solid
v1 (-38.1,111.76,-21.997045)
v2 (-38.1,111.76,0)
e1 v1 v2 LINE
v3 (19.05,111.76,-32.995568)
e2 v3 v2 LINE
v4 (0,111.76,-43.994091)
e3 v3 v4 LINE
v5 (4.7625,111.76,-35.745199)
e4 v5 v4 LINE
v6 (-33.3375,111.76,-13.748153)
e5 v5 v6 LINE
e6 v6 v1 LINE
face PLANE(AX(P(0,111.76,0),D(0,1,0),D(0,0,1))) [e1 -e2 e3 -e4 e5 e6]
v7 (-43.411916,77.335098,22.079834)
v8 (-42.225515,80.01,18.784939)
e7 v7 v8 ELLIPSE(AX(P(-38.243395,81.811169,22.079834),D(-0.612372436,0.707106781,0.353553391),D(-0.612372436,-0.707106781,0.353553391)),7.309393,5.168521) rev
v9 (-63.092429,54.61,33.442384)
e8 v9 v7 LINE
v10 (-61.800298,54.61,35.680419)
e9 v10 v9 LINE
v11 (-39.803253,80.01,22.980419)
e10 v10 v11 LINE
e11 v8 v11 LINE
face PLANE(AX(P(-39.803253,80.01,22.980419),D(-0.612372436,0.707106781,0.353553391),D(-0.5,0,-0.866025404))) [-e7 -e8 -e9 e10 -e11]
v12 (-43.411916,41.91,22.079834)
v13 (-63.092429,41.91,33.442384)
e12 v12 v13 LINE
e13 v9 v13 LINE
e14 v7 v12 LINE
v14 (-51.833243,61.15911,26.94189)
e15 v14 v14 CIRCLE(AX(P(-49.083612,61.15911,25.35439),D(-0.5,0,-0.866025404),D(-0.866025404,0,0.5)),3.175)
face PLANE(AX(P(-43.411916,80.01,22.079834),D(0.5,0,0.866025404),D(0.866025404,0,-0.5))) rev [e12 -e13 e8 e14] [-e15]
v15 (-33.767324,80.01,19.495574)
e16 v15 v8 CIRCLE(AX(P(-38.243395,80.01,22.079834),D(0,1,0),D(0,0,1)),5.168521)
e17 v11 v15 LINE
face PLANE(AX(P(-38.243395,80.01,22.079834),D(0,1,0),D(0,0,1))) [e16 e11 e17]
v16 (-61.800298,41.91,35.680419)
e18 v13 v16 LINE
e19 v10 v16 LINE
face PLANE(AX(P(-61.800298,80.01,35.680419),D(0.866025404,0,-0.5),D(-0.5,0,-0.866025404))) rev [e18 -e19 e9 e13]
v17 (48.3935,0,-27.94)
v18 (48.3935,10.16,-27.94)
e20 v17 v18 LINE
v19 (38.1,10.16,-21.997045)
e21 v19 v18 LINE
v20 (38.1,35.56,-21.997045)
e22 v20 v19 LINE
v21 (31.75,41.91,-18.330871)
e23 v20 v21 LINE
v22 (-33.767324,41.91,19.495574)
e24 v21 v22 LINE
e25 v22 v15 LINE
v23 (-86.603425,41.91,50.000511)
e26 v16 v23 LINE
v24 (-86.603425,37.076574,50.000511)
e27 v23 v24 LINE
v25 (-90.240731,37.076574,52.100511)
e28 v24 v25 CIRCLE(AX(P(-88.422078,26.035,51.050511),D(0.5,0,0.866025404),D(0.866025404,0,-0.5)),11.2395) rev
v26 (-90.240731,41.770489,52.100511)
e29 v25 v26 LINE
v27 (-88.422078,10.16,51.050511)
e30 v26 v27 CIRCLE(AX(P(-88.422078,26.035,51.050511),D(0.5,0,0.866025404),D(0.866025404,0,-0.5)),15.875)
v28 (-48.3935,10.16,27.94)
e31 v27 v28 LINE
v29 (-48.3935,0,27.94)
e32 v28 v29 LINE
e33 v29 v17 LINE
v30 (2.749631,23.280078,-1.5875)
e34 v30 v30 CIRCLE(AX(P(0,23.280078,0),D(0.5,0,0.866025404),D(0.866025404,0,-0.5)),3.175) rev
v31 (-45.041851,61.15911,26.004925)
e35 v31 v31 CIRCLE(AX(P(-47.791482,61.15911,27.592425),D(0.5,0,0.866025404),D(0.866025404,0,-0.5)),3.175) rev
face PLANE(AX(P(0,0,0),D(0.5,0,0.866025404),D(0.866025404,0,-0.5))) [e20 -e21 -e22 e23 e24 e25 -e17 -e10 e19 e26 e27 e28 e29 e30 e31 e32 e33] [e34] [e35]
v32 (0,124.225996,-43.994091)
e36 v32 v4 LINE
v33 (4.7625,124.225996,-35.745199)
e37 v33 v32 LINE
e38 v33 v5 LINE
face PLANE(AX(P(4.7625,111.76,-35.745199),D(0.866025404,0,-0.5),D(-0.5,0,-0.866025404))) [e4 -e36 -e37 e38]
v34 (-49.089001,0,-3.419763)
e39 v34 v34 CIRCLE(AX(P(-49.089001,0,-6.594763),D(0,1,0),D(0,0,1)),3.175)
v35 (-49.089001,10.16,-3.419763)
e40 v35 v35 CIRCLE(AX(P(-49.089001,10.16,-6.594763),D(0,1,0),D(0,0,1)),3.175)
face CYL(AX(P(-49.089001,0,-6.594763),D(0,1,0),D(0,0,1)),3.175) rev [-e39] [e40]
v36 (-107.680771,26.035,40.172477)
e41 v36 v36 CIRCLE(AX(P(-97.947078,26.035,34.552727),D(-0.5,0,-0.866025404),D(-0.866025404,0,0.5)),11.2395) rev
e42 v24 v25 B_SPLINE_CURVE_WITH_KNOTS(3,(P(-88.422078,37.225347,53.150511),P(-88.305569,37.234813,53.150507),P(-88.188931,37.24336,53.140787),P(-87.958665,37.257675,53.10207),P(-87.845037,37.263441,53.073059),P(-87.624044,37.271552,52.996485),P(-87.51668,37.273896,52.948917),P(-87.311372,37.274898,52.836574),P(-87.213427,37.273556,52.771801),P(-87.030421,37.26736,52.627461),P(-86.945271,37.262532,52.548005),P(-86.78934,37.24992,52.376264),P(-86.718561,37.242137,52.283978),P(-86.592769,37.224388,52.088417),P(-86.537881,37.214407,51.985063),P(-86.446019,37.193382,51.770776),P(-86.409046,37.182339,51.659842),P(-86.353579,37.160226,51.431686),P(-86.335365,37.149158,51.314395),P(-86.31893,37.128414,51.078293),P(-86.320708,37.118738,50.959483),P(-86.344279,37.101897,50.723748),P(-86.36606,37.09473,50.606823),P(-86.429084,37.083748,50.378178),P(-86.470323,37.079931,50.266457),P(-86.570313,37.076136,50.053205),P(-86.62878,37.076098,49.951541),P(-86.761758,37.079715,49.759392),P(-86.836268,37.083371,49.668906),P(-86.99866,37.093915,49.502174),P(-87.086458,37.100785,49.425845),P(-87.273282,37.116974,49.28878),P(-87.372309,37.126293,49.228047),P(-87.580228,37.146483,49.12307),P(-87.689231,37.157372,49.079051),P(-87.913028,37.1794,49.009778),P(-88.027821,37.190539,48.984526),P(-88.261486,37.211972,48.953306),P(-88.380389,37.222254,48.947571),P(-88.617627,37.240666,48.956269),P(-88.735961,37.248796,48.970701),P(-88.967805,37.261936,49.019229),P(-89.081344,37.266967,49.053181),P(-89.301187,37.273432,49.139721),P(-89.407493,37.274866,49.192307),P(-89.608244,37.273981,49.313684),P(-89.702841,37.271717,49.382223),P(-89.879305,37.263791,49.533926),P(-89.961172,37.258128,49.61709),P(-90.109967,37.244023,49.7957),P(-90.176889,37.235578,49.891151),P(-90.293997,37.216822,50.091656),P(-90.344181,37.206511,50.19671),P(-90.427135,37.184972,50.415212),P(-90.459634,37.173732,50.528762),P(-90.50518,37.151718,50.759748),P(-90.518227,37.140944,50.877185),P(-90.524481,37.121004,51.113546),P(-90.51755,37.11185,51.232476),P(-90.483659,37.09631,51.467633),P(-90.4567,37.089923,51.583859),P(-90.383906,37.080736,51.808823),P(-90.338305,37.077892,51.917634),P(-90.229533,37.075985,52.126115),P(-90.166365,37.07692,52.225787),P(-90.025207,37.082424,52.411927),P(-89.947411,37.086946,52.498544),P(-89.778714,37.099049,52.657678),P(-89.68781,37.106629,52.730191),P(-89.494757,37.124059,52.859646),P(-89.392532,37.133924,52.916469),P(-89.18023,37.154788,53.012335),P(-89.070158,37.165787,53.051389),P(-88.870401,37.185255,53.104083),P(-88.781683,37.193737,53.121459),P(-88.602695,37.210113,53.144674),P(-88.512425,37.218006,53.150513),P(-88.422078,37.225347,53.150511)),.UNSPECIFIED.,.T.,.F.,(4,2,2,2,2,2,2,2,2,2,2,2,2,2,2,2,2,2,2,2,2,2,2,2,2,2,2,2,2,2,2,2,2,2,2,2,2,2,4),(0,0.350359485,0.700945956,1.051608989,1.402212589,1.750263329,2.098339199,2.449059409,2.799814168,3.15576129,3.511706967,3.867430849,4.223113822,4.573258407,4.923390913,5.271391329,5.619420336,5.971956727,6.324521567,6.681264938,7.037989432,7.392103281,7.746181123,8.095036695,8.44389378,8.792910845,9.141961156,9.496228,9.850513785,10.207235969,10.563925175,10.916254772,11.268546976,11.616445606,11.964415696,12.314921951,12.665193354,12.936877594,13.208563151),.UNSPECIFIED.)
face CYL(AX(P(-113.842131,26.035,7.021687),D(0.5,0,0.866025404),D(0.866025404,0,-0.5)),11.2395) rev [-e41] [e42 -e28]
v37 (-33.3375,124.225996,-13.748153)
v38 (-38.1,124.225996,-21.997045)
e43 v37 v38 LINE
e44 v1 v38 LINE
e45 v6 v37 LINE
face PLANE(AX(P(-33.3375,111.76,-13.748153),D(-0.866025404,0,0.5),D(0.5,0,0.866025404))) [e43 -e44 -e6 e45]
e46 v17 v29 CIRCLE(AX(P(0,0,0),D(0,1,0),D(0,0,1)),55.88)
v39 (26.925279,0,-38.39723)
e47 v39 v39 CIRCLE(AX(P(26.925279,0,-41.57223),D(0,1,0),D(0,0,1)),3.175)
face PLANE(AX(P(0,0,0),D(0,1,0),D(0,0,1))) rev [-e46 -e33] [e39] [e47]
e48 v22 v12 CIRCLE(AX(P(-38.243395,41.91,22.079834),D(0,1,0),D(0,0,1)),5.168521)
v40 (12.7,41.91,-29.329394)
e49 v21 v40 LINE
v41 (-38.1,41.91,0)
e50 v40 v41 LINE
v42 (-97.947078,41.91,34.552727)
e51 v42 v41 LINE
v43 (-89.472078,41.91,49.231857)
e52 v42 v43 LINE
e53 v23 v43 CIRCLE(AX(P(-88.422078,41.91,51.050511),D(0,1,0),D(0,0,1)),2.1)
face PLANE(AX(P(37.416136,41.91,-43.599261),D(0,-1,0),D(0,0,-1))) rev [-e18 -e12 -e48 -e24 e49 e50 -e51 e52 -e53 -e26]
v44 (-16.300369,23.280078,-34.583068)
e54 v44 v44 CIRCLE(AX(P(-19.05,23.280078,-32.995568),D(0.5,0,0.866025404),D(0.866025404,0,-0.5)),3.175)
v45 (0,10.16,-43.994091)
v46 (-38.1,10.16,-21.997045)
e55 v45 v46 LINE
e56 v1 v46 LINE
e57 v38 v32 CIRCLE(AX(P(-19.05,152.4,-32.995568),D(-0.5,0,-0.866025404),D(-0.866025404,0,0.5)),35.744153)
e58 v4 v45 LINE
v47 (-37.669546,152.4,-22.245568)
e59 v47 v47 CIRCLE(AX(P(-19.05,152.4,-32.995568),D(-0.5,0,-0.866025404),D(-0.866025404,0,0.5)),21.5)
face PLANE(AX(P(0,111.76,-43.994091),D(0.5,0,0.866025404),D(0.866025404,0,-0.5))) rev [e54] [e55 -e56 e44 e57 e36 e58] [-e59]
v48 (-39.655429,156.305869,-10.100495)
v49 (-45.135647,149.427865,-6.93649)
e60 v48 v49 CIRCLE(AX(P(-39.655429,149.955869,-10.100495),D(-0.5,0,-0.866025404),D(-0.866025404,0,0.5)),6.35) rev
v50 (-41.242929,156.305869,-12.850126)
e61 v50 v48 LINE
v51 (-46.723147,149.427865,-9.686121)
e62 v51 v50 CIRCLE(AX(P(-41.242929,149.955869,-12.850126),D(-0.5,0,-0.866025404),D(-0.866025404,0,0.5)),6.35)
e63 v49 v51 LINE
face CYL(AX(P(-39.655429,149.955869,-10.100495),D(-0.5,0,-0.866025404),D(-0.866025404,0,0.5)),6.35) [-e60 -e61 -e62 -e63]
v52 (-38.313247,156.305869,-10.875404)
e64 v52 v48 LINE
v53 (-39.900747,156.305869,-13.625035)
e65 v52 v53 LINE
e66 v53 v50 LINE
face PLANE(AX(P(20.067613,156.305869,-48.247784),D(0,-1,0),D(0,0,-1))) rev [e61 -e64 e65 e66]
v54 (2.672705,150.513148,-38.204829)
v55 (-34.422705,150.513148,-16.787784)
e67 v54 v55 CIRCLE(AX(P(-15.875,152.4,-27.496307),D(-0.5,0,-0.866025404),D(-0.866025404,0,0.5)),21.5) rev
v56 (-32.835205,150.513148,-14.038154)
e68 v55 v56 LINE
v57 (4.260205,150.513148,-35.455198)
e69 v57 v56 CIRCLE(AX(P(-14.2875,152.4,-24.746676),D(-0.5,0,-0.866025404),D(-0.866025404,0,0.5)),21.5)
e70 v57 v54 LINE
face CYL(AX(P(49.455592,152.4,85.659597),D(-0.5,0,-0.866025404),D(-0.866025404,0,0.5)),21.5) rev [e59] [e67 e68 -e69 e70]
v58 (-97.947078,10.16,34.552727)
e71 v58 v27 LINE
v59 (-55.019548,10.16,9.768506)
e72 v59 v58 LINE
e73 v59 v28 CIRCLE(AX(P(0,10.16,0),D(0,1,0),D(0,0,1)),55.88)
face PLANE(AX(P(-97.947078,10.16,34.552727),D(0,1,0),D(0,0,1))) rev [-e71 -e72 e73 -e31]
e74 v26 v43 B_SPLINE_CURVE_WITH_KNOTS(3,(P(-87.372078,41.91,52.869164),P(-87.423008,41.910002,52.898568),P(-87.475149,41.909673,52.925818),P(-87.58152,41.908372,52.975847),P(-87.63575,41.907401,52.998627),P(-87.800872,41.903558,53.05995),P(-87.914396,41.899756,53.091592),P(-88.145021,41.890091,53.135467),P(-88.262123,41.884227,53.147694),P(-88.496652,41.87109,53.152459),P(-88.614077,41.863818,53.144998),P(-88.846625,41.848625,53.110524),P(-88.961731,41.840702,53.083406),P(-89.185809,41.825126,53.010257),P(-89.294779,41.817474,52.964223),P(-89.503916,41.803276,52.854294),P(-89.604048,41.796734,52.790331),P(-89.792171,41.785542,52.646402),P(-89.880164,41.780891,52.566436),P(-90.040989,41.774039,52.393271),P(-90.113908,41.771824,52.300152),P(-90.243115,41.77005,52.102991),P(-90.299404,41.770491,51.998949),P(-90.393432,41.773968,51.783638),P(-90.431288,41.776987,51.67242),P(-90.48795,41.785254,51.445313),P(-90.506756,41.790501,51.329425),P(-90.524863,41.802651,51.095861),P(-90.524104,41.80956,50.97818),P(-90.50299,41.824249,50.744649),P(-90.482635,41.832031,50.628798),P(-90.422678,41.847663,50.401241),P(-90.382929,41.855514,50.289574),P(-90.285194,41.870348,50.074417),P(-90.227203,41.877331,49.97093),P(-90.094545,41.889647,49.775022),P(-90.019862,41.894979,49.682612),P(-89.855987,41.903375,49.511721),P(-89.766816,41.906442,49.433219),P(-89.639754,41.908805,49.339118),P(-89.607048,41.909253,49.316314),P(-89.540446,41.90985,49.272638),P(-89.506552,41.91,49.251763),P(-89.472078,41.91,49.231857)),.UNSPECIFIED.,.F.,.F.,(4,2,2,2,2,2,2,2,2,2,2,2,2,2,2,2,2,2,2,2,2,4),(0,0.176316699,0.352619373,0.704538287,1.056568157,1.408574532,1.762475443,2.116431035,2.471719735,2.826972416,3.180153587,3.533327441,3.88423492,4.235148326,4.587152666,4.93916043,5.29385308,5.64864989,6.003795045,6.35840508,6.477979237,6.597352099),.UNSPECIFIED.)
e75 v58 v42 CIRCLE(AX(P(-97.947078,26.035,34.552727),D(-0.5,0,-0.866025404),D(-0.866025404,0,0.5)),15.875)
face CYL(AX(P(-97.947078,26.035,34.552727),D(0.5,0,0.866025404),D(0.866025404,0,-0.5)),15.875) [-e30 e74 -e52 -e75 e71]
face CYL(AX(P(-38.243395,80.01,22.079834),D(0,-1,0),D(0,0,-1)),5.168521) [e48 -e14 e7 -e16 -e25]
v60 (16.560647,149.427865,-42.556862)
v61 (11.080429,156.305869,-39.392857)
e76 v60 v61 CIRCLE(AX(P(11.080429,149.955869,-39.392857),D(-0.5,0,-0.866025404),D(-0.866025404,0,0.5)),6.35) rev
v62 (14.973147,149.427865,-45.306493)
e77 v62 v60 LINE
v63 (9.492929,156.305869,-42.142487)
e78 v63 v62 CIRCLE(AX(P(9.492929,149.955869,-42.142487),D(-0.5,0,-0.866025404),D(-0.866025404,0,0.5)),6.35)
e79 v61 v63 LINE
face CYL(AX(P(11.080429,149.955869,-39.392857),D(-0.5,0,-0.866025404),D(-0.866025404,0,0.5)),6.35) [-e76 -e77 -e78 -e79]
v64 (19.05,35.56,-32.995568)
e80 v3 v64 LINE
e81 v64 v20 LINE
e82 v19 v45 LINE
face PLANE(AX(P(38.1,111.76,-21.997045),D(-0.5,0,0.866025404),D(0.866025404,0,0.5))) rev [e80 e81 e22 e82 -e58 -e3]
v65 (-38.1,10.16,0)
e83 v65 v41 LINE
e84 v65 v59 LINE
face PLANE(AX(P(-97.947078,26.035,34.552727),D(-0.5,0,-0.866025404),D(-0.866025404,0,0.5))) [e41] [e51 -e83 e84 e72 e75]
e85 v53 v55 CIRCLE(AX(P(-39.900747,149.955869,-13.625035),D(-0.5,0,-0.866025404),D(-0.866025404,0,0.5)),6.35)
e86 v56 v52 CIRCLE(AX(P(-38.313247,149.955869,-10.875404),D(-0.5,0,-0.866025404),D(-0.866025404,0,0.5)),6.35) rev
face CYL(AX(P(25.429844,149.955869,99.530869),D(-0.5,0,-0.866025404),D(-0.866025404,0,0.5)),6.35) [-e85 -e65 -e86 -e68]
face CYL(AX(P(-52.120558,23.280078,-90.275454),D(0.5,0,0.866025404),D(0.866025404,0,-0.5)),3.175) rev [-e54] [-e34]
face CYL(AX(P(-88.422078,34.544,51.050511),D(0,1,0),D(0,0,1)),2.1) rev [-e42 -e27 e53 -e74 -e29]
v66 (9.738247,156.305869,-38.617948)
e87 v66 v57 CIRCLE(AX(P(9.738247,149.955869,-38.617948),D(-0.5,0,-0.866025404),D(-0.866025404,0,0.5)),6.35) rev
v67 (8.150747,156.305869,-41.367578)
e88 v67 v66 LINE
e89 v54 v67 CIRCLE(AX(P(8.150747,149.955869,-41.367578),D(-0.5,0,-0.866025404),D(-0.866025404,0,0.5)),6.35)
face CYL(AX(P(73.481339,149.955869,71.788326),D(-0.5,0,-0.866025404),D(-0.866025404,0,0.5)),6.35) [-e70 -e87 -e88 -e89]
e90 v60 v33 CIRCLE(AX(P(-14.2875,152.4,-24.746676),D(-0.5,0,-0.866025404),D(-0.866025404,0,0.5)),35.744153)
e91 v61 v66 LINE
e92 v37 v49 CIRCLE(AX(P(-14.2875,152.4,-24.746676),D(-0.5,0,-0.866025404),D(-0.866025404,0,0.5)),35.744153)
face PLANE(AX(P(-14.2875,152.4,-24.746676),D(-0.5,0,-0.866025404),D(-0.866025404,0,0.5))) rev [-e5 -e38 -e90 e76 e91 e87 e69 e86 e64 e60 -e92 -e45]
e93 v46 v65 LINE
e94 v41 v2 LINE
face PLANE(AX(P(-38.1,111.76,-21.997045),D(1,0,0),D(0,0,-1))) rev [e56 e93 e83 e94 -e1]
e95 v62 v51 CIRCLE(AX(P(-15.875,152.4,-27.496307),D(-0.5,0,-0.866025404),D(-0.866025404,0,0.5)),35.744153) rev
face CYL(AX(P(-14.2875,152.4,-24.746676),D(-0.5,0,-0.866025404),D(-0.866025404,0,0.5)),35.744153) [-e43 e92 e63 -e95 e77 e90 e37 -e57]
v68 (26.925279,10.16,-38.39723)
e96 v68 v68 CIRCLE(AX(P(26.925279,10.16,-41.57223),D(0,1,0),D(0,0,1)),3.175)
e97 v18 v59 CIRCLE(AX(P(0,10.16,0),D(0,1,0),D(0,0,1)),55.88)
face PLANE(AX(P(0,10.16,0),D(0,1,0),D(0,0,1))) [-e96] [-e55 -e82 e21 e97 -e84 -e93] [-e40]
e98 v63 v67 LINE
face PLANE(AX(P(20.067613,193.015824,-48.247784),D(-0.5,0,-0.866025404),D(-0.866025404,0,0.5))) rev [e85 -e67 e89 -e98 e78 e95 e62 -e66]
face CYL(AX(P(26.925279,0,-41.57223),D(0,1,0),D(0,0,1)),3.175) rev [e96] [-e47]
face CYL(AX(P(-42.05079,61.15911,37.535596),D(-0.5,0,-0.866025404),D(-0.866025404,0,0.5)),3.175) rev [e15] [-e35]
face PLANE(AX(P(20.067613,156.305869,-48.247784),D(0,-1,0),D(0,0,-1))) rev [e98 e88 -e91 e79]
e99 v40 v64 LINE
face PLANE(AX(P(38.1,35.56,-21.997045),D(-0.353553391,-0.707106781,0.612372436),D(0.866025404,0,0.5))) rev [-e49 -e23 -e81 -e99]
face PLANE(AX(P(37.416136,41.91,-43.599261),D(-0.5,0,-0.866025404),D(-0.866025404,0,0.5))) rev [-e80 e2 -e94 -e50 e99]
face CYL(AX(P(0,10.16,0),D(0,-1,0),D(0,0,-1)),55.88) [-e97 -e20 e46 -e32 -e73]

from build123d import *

# Parameters (mm, degrees)
SKETCH4_R            = 55.88
BOSS_EXTRUDE2_DEPTH  = 10.16
BOSS_EXTRUDE4_DEPTH  = 101.6
BOSS_EXTRUDE5_DEPTH  = 9.525
BOSS_EXTRUDE6_START  = -9.525
BOSS_EXTRUDE6_DEPTH  = 9.525
CUT_EXTRUDE4_REACH   = 223.16
SKETCH12_R           = 21.5
SKETCH13_W           = 38.1
SKETCH13_H           = 69.85
CUT_EXTRUDE5_DEPTH   = 76.2
BOSS_EXTRUDE10_DEPTH = 19.05
SKETCH28_R           = 11.2395
CUT_EXTRUDE9_DEPTH   = 38.1
CUT_EXTRUDE10_DEPTH  = 7.366
CHAMFER1_SIZE        = 6.35
SKETCH30_R           = 2.1
CUT_EXTRUDE11_DEPTH  = 7.366
SKETCH31_R           = 3.175
CUT_EXTRUDE12_DEPTH  = 223.900333216
BOSS_EXTRUDE11_DEPTH = 38.1
CHAMFER2_SIZE        = 25.4
CUT_EXTRUDE13_REACH  = 233.204
SKETCH34_R           = 3.175
SKETCH35_R           = 3.175
CUT_EXTRUDE14_DEPTH  = 246.746626534
SKETCH36_W           = 63.5
SKETCH36_H           = 36.709955102
CUT_EXTRUDE15_DEPTH  = 63.5
FILLET1_R            = 6.35
SKETCH37_W           = 210.742334846
SKETCH37_H           = 201.224939079
CUT_EXTRUDE16_DEPTH  = 232.093968202


with BuildPart() as part:
    # Sketch4 → Boss-Extrude2 (new body)
    with BuildSketch(Plane(origin=(0, 0, 0), x_dir=(1, 0, 0), z_dir=(0, 1, 0))):
        with Locations(Location((0, 0, 0), (0, 0, 270))):
            Circle(SKETCH4_R)
    extrude(amount=BOSS_EXTRUDE2_DEPTH)

    # Sketch8 → Boss-Extrude4 (add)
    with BuildSketch(Plane(origin=(0, 10.16, 0), x_dir=(1, 0, 0), z_dir=(0, 1, 0))):
        Polygon((0, 43.994090512), (-38.1, 21.997045256), (-38.1, -21.997045256), (0, -43.994090512), (38.1, -21.997045256), (38.1, 21.997045256), align=None)
    extrude(amount=BOSS_EXTRUDE4_DEPTH)

    # Sketch9 → Boss-Extrude5 (add)
    with BuildSketch(Plane(origin=(-19.05, 0, -32.995567884), x_dir=(-0.8660254037844386, 0, 0.5000000000000003), z_dir=(-0.5000000000000002, 0, -0.8660254037844385))):
        with BuildLine():
            Line((21.997045256, 111.76), (-21.997045256, 111.76))
            Line((-21.997045256, 111.76), (-21.997045256, 124.225996336))
            ThreePointArc((-21.997045256, 124.225996336), (0, 188.144153123), (21.997045256, 124.225996336))
            Line((21.997045256, 124.225996336), (21.997045256, 111.76))
        make_face()
    extrude(amount=-BOSS_EXTRUDE5_DEPTH)

    # Sketch10 → Boss-Extrude6 (add)
    with BuildSketch(Plane(origin=(19.05, 0, 32.995567884), x_dir=(0.8660254037844386, 0, -0.5000000000000001), z_dir=(0.5000000000000001, 0, 0.8660254037844386)).offset(BOSS_EXTRUDE6_START)):
        with BuildLine():
            Line((-21.997045256, 111.76), (21.997045256, 111.76))
            Line((21.997045256, 111.76), (21.997045256, 124.225996336))
            ThreePointArc((21.997045256, 124.225996336), (0, 188.144153123), (-21.997045256, 124.225996336))
            Line((-21.997045256, 124.225996336), (-21.997045256, 111.76))
        make_face()
    extrude(amount=BOSS_EXTRUDE6_DEPTH)

    # Cut-Extrude4: up to this face of the body (flat: up to its plane)
    cut_extrude4_end = Plane(part.part.faces().sort_by_distance((19.05, 104.643172711, 32.995567884))[0])
    # Sketch12 → Cut-Extrude4 (cut, up to the picked face)
    with BuildSketch(Plane(origin=(-19.05, 0, -32.995567884), x_dir=(-0.8660254037844386, 0, 0.5000000000000003), z_dir=(-0.5000000000000002, 0, -0.8660254037844385)), mode=Mode.PRIVATE) as cut_extrude4_sk1:
        with Locations((0, 152.4)):
            Circle(SKETCH12_R)
    cut_extrude4_tool1 = split(extrude(cut_extrude4_sk1.sketch, amount=-CUT_EXTRUDE4_REACH, mode=Mode.PRIVATE), bisect_by=cut_extrude4_end, keep=Keep.BOTH, mode=Mode.PRIVATE)
    add(cut_extrude4_tool1.solids().sort_by(Axis((-19.05, 152.4, -32.995568), (0.5000000000000002, 0, 0.8660254037844385)))[0], mode=Mode.SUBTRACT)

    # Sketch13 → Cut-Extrude5 (cut, symmetric)
    with BuildSketch(Plane(origin=(-19.05, 0, 10.998522628), x_dir=(0.5000000000000002, 0, 0.8660254037844386), z_dir=(-0.8660254037844385, 0, 0.5000000000000001))):
        with Locations((0, 76.835)):
            Rectangle(SKETCH13_W, SKETCH13_H)
    extrude(amount=CUT_EXTRUDE5_DEPTH, both=True, mode=Mode.SUBTRACT)

    # Sketch22 → Boss-Extrude10 (add, symmetric)
    with BuildSketch(Plane(origin=(0, 0, 0), x_dir=(-0.8660254037844386, 0, 0.5000000000000001), z_dir=(-0.5000000000000001, 0, -0.8660254037844386))):
        with BuildLine():
            Line((43.994090512, 41.91), (102.10102108, 41.91))
            ThreePointArc((102.10102108, 41.91), (117.97602108, 26.035), (102.10102108, 10.16))
            Line((102.10102108, 10.16), (43.994090512, 10.16))
            Line((43.994090512, 10.16), (21.997045256, 10.16))
            Line((21.997045256, 10.16), (21.997045256, 41.91))
            Line((21.997045256, 41.91), (43.994090512, 41.91))
        make_face()
    extrude(amount=BOSS_EXTRUDE10_DEPTH, both=True)

    # Sketch28 → Cut-Extrude9 (cut)
    with BuildSketch(Plane(origin=(9.525, 0, 16.497783942), x_dir=(0.8660254037844386, 0, -0.5000000000000001), z_dir=(0.5000000000000001, 0, 0.8660254037844386))):
        with Locations((-102.10102108, 26.035)):
            Circle(SKETCH28_R)
    extrude(amount=-CUT_EXTRUDE9_DEPTH, mode=Mode.SUBTRACT)

    # Sketch29 → Cut-Extrude10 (cut)
    with BuildSketch(Plane(origin=(9.525, 0, 16.497783942), x_dir=(0.8660254037844386, 0, -0.5000000000000001), z_dir=(0.5000000000000001, 0, 0.8660254037844386))):
        with BuildLine():
            Line((-115.737415068, 17.907), (-109.863879848, 17.907))
            ThreePointArc((-109.863879848, 17.907), (-113.34052108, 26.035), (-109.863879848, 34.163))
            Line((-109.863879848, 34.163), (-115.737415068, 34.163))
            ThreePointArc((-115.737415068, 34.163), (-117.97602108, 26.035), (-115.737415068, 17.907))
        make_face()
    extrude(amount=-CUT_EXTRUDE10_DEPTH, mode=Mode.SUBTRACT)

    # Chamfer1
    chamfer1_edges = [part.edges().sort_by_distance(p)[0] for p in [
        (38.1, 41.91, -10.998522628),
        (28.575, 41.91, -27.49630657),
    ]]
    chamfer(chamfer1_edges, length=CHAMFER1_SIZE)

    # Sketch30 → Cut-Extrude11 (cut)
    with BuildSketch(Plane(origin=(0, 41.91, 0), x_dir=(1, 0, 0), z_dir=(0, 1, 0))):
        with Locations(Location((-88.422078008, -51.05051054, 0), (0, 0, 270))):
            Circle(SKETCH30_R)
    extrude(amount=-CUT_EXTRUDE11_DEPTH, mode=Mode.SUBTRACT)

    # Sketch31 → Cut-Extrude12 (cut, through all)
    with BuildSketch(Plane(origin=(0, 10.16, 0), x_dir=(1, 0, 0), z_dir=(0, 1, 0))):
        with Locations(Location((-49.089000823, 6.594762938, 0), (0, 0, 270))):
            Circle(SKETCH31_R)
        with Locations(Location((26.925278647, 41.57222955, 0), (0, 0, 270))):
            Circle(SKETCH31_R)
    cut_extrude12 = extrude(amount=-CUT_EXTRUDE12_DEPTH, mode=Mode.SUBTRACT)

    # Mirror1: Cut-Extrude12 across plane
    add(cut_extrude12.mirror(Plane(origin=(0, 0, 0), x_dir=(-0.8660254037844386, 0, 0.5000000000000001), z_dir=(-0.5000000000000001, 0, -0.8660254037844386))), mode=Mode.SUBTRACT)

    # Sketch33 → Boss-Extrude11 (add)
    with BuildSketch(Plane(origin=(0, 41.91, 0), x_dir=(1, 0, 0), z_dir=(0, 1, 0))):
        with BuildLine():
            Line((-43.411916389, -22.079834386), (-63.092428819, -33.442383535))
            Line((-63.092428819, -33.442383535), (-61.800298466, -35.680418955))
            Line((-61.800298466, -35.680418955), (-60.542722832, -37.858603849))
            Line((-60.542722832, -37.858603849), (-40.91541904, -26.504074545))
            ThreePointArc((-40.91541904, -26.504074545), (-33.742060338, -19.539834386), (-43.411916389, -22.079834386))
        make_face()
    extrude(amount=BOSS_EXTRUDE11_DEPTH)

    # Chamfer2
    chamfer2_edges = [part.edges().sort_by_distance(p)[0] for p in [
        (-61.817575825, 80.01, 35.650493692),
    ]]
    chamfer(chamfer2_edges, length=CHAMFER2_SIZE)

    # Cut-Extrude13: up to this plane
    cut_extrude13_end = Plane(origin=(-60.542722832, 80.01, 37.858603849), z_dir=(-0.500750644235671, 0, -0.8655915851587056))
    # Sketch34 → Cut-Extrude13 (cut, up to the surface)
    with BuildSketch(Plane(origin=(-1.292130352, 0, -2.23803542), x_dir=(-0.8660254037844386, 0, 0.5000000000000003), z_dir=(-0.5000000000000002, 0, -0.8660254037844385)), mode=Mode.PRIVATE) as cut_extrude13_sk1:
        with Locations((55.184849848, 61.159110234)):
            Circle(SKETCH34_R)
    cut_extrude13_tool1 = split(extrude(cut_extrude13_sk1.sketch, amount=-CUT_EXTRUDE13_REACH, mode=Mode.PRIVATE), bisect_by=cut_extrude13_end, keep=Keep.BOTH, mode=Mode.PRIVATE)
    add(cut_extrude13_tool1.solids().sort_by_distance((-49.083612, 61.15911, 25.35439))[0], mode=Mode.SUBTRACT)

    # Sketch35 → Cut-Extrude14 (cut, through all)
    with BuildSketch(Plane(origin=(19.05, 0, 32.995567884), x_dir=(0.8660254037844386, 0, -0.5000000000000001), z_dir=(0.5000000000000001, 0, 0.8660254037844386))):
        with Locations((0, 23.280078313)):
            Circle(SKETCH35_R)
    extrude(amount=-CUT_EXTRUDE14_DEPTH, mode=Mode.SUBTRACT)

    # Sketch36 → Cut-Extrude15 (cut, symmetric)
    with BuildSketch(Plane(origin=(-19.05, 0, 10.998522628), x_dir=(0.5000000000000004, 0, 0.8660254037844384), z_dir=(-0.8660254037844384, 0, 0.5000000000000004))):
        with Locations((0, 174.660846527)):
            Rectangle(SKETCH36_W, SKETCH36_H)
    extrude(amount=CUT_EXTRUDE15_DEPTH, both=True, mode=Mode.SUBTRACT)

    # Fillet1
    # the kernel refuses this fillet: 6.35 mm, written as the material it takes off along each edge
    with BuildSketch(Plane(origin=(12.272597523, 156.305868976, -21.027711652), x_dir=(0.04103819462533737, -0.9988766133891899, -0.023693412713994805), z_dir=(-0.5000000000000003, 0, -0.8660254037844386))) as fillet1_piece_1:
        with BuildLine():
            CenterArc((6.655634068, -6.291985478), FILLET1_R, 97.750867839, 84.965214409)
            Line((0.312767573, -6.592891819), (0, 0))
            ThreePointArc((0, 0), (2.899617679, -0.196427123), (5.799235358, 0))
        make_face()
    extrude(amount=19.675766287, mode=Mode.SUBTRACT)
    with BuildSketch(Plane(origin=(-24.346831236, 156.305868976, 0.114525399), x_dir=(-0.04103819462533767, -0.9988766133891899, 0.023693412713994975), z_dir=(-0.5000000000000003, 0, -0.8660254037844386))) as fillet1_piece_2:
        with BuildLine():
            CenterArc((6.655634068, 6.291985478), FILLET1_R, 177.283917752, 84.965214409)
            Line((0.312767573, 6.592891819), (0, 0))
            ThreePointArc((0, 0), (2.899617679, 0.196427123), (5.799235358, 0))
        make_face()
    extrude(amount=19.675766287, mode=Mode.SUBTRACT)
    with BuildSketch(Plane(origin=(-14.894977291, 156.305868976, 45.261361242), x_dir=(-0.011364190914464473, -0.999913899736612, 0.0065611186835884), z_dir=(-0.5000000000000002, 0, -0.8660254037844386)), Plane(origin=(-36.459231913, 156.305868976, 7.91097661), x_dir=(-0.011364190914463116, -0.999913899736612, 0.0065611186835876165), z_dir=(-0.5000000000000002, 0, -0.8660254037844386))) as fillet1_piece_3:
        with BuildLine():
            CenterArc((6.26760006, -6.320536654), FILLET1_R, 84.478464497, 94.769665105)
            Line((-0.081853204, -6.237210446), (0, 0))
            ThreePointArc((0, 0), (3.439298151, 0.165849191), (6.878596303, 0))
        make_face()
    extrude(amount=20.371490756, mode=Mode.SUBTRACT)
    with BuildSketch(Plane(origin=(25.080722669, 156.305868976, -27.619132734), x_dir=(0.011364190914465366, -0.999913899736612, -0.00656111868358885), z_dir=(-0.5000000000000002, 0, -0.8660254037844386)), Plane(origin=(46.644977291, 156.305868976, 9.731251898), x_dir=(0.011364190914466365, -0.999913899736612, -0.006561118683589426), z_dir=(-0.5000000000000002, 0, -0.8660254037844386))) as fillet1_piece_4:
        with BuildLine():
            CenterArc((6.26760006, 6.320536654), FILLET1_R, 180.751870398, 94.769665105)
            Line((-0.081853204, 6.237210446), (0, 0))
            ThreePointArc((0, 0), (3.439298151, -0.165849191), (6.878596303, 0))
        make_face()
    extrude(amount=20.371490756, mode=Mode.SUBTRACT)

    # Sketch37 → Cut-Extrude16 (cut, through all)
    with BuildSketch(Plane(origin=(0, 0, 0), x_dir=(-0.8660254037844386, 0, 0.5000000000000001), z_dir=(-0.5000000000000001, 0, -0.8660254037844386))):
        with Locations((30.487295463, 97.29801522)):
            Rectangle(SKETCH37_W, SKETCH37_H)
    extrude(amount=-CUT_EXTRUDE16_DEPTH, mode=Mode.SUBTRACT)


solid = part.part
